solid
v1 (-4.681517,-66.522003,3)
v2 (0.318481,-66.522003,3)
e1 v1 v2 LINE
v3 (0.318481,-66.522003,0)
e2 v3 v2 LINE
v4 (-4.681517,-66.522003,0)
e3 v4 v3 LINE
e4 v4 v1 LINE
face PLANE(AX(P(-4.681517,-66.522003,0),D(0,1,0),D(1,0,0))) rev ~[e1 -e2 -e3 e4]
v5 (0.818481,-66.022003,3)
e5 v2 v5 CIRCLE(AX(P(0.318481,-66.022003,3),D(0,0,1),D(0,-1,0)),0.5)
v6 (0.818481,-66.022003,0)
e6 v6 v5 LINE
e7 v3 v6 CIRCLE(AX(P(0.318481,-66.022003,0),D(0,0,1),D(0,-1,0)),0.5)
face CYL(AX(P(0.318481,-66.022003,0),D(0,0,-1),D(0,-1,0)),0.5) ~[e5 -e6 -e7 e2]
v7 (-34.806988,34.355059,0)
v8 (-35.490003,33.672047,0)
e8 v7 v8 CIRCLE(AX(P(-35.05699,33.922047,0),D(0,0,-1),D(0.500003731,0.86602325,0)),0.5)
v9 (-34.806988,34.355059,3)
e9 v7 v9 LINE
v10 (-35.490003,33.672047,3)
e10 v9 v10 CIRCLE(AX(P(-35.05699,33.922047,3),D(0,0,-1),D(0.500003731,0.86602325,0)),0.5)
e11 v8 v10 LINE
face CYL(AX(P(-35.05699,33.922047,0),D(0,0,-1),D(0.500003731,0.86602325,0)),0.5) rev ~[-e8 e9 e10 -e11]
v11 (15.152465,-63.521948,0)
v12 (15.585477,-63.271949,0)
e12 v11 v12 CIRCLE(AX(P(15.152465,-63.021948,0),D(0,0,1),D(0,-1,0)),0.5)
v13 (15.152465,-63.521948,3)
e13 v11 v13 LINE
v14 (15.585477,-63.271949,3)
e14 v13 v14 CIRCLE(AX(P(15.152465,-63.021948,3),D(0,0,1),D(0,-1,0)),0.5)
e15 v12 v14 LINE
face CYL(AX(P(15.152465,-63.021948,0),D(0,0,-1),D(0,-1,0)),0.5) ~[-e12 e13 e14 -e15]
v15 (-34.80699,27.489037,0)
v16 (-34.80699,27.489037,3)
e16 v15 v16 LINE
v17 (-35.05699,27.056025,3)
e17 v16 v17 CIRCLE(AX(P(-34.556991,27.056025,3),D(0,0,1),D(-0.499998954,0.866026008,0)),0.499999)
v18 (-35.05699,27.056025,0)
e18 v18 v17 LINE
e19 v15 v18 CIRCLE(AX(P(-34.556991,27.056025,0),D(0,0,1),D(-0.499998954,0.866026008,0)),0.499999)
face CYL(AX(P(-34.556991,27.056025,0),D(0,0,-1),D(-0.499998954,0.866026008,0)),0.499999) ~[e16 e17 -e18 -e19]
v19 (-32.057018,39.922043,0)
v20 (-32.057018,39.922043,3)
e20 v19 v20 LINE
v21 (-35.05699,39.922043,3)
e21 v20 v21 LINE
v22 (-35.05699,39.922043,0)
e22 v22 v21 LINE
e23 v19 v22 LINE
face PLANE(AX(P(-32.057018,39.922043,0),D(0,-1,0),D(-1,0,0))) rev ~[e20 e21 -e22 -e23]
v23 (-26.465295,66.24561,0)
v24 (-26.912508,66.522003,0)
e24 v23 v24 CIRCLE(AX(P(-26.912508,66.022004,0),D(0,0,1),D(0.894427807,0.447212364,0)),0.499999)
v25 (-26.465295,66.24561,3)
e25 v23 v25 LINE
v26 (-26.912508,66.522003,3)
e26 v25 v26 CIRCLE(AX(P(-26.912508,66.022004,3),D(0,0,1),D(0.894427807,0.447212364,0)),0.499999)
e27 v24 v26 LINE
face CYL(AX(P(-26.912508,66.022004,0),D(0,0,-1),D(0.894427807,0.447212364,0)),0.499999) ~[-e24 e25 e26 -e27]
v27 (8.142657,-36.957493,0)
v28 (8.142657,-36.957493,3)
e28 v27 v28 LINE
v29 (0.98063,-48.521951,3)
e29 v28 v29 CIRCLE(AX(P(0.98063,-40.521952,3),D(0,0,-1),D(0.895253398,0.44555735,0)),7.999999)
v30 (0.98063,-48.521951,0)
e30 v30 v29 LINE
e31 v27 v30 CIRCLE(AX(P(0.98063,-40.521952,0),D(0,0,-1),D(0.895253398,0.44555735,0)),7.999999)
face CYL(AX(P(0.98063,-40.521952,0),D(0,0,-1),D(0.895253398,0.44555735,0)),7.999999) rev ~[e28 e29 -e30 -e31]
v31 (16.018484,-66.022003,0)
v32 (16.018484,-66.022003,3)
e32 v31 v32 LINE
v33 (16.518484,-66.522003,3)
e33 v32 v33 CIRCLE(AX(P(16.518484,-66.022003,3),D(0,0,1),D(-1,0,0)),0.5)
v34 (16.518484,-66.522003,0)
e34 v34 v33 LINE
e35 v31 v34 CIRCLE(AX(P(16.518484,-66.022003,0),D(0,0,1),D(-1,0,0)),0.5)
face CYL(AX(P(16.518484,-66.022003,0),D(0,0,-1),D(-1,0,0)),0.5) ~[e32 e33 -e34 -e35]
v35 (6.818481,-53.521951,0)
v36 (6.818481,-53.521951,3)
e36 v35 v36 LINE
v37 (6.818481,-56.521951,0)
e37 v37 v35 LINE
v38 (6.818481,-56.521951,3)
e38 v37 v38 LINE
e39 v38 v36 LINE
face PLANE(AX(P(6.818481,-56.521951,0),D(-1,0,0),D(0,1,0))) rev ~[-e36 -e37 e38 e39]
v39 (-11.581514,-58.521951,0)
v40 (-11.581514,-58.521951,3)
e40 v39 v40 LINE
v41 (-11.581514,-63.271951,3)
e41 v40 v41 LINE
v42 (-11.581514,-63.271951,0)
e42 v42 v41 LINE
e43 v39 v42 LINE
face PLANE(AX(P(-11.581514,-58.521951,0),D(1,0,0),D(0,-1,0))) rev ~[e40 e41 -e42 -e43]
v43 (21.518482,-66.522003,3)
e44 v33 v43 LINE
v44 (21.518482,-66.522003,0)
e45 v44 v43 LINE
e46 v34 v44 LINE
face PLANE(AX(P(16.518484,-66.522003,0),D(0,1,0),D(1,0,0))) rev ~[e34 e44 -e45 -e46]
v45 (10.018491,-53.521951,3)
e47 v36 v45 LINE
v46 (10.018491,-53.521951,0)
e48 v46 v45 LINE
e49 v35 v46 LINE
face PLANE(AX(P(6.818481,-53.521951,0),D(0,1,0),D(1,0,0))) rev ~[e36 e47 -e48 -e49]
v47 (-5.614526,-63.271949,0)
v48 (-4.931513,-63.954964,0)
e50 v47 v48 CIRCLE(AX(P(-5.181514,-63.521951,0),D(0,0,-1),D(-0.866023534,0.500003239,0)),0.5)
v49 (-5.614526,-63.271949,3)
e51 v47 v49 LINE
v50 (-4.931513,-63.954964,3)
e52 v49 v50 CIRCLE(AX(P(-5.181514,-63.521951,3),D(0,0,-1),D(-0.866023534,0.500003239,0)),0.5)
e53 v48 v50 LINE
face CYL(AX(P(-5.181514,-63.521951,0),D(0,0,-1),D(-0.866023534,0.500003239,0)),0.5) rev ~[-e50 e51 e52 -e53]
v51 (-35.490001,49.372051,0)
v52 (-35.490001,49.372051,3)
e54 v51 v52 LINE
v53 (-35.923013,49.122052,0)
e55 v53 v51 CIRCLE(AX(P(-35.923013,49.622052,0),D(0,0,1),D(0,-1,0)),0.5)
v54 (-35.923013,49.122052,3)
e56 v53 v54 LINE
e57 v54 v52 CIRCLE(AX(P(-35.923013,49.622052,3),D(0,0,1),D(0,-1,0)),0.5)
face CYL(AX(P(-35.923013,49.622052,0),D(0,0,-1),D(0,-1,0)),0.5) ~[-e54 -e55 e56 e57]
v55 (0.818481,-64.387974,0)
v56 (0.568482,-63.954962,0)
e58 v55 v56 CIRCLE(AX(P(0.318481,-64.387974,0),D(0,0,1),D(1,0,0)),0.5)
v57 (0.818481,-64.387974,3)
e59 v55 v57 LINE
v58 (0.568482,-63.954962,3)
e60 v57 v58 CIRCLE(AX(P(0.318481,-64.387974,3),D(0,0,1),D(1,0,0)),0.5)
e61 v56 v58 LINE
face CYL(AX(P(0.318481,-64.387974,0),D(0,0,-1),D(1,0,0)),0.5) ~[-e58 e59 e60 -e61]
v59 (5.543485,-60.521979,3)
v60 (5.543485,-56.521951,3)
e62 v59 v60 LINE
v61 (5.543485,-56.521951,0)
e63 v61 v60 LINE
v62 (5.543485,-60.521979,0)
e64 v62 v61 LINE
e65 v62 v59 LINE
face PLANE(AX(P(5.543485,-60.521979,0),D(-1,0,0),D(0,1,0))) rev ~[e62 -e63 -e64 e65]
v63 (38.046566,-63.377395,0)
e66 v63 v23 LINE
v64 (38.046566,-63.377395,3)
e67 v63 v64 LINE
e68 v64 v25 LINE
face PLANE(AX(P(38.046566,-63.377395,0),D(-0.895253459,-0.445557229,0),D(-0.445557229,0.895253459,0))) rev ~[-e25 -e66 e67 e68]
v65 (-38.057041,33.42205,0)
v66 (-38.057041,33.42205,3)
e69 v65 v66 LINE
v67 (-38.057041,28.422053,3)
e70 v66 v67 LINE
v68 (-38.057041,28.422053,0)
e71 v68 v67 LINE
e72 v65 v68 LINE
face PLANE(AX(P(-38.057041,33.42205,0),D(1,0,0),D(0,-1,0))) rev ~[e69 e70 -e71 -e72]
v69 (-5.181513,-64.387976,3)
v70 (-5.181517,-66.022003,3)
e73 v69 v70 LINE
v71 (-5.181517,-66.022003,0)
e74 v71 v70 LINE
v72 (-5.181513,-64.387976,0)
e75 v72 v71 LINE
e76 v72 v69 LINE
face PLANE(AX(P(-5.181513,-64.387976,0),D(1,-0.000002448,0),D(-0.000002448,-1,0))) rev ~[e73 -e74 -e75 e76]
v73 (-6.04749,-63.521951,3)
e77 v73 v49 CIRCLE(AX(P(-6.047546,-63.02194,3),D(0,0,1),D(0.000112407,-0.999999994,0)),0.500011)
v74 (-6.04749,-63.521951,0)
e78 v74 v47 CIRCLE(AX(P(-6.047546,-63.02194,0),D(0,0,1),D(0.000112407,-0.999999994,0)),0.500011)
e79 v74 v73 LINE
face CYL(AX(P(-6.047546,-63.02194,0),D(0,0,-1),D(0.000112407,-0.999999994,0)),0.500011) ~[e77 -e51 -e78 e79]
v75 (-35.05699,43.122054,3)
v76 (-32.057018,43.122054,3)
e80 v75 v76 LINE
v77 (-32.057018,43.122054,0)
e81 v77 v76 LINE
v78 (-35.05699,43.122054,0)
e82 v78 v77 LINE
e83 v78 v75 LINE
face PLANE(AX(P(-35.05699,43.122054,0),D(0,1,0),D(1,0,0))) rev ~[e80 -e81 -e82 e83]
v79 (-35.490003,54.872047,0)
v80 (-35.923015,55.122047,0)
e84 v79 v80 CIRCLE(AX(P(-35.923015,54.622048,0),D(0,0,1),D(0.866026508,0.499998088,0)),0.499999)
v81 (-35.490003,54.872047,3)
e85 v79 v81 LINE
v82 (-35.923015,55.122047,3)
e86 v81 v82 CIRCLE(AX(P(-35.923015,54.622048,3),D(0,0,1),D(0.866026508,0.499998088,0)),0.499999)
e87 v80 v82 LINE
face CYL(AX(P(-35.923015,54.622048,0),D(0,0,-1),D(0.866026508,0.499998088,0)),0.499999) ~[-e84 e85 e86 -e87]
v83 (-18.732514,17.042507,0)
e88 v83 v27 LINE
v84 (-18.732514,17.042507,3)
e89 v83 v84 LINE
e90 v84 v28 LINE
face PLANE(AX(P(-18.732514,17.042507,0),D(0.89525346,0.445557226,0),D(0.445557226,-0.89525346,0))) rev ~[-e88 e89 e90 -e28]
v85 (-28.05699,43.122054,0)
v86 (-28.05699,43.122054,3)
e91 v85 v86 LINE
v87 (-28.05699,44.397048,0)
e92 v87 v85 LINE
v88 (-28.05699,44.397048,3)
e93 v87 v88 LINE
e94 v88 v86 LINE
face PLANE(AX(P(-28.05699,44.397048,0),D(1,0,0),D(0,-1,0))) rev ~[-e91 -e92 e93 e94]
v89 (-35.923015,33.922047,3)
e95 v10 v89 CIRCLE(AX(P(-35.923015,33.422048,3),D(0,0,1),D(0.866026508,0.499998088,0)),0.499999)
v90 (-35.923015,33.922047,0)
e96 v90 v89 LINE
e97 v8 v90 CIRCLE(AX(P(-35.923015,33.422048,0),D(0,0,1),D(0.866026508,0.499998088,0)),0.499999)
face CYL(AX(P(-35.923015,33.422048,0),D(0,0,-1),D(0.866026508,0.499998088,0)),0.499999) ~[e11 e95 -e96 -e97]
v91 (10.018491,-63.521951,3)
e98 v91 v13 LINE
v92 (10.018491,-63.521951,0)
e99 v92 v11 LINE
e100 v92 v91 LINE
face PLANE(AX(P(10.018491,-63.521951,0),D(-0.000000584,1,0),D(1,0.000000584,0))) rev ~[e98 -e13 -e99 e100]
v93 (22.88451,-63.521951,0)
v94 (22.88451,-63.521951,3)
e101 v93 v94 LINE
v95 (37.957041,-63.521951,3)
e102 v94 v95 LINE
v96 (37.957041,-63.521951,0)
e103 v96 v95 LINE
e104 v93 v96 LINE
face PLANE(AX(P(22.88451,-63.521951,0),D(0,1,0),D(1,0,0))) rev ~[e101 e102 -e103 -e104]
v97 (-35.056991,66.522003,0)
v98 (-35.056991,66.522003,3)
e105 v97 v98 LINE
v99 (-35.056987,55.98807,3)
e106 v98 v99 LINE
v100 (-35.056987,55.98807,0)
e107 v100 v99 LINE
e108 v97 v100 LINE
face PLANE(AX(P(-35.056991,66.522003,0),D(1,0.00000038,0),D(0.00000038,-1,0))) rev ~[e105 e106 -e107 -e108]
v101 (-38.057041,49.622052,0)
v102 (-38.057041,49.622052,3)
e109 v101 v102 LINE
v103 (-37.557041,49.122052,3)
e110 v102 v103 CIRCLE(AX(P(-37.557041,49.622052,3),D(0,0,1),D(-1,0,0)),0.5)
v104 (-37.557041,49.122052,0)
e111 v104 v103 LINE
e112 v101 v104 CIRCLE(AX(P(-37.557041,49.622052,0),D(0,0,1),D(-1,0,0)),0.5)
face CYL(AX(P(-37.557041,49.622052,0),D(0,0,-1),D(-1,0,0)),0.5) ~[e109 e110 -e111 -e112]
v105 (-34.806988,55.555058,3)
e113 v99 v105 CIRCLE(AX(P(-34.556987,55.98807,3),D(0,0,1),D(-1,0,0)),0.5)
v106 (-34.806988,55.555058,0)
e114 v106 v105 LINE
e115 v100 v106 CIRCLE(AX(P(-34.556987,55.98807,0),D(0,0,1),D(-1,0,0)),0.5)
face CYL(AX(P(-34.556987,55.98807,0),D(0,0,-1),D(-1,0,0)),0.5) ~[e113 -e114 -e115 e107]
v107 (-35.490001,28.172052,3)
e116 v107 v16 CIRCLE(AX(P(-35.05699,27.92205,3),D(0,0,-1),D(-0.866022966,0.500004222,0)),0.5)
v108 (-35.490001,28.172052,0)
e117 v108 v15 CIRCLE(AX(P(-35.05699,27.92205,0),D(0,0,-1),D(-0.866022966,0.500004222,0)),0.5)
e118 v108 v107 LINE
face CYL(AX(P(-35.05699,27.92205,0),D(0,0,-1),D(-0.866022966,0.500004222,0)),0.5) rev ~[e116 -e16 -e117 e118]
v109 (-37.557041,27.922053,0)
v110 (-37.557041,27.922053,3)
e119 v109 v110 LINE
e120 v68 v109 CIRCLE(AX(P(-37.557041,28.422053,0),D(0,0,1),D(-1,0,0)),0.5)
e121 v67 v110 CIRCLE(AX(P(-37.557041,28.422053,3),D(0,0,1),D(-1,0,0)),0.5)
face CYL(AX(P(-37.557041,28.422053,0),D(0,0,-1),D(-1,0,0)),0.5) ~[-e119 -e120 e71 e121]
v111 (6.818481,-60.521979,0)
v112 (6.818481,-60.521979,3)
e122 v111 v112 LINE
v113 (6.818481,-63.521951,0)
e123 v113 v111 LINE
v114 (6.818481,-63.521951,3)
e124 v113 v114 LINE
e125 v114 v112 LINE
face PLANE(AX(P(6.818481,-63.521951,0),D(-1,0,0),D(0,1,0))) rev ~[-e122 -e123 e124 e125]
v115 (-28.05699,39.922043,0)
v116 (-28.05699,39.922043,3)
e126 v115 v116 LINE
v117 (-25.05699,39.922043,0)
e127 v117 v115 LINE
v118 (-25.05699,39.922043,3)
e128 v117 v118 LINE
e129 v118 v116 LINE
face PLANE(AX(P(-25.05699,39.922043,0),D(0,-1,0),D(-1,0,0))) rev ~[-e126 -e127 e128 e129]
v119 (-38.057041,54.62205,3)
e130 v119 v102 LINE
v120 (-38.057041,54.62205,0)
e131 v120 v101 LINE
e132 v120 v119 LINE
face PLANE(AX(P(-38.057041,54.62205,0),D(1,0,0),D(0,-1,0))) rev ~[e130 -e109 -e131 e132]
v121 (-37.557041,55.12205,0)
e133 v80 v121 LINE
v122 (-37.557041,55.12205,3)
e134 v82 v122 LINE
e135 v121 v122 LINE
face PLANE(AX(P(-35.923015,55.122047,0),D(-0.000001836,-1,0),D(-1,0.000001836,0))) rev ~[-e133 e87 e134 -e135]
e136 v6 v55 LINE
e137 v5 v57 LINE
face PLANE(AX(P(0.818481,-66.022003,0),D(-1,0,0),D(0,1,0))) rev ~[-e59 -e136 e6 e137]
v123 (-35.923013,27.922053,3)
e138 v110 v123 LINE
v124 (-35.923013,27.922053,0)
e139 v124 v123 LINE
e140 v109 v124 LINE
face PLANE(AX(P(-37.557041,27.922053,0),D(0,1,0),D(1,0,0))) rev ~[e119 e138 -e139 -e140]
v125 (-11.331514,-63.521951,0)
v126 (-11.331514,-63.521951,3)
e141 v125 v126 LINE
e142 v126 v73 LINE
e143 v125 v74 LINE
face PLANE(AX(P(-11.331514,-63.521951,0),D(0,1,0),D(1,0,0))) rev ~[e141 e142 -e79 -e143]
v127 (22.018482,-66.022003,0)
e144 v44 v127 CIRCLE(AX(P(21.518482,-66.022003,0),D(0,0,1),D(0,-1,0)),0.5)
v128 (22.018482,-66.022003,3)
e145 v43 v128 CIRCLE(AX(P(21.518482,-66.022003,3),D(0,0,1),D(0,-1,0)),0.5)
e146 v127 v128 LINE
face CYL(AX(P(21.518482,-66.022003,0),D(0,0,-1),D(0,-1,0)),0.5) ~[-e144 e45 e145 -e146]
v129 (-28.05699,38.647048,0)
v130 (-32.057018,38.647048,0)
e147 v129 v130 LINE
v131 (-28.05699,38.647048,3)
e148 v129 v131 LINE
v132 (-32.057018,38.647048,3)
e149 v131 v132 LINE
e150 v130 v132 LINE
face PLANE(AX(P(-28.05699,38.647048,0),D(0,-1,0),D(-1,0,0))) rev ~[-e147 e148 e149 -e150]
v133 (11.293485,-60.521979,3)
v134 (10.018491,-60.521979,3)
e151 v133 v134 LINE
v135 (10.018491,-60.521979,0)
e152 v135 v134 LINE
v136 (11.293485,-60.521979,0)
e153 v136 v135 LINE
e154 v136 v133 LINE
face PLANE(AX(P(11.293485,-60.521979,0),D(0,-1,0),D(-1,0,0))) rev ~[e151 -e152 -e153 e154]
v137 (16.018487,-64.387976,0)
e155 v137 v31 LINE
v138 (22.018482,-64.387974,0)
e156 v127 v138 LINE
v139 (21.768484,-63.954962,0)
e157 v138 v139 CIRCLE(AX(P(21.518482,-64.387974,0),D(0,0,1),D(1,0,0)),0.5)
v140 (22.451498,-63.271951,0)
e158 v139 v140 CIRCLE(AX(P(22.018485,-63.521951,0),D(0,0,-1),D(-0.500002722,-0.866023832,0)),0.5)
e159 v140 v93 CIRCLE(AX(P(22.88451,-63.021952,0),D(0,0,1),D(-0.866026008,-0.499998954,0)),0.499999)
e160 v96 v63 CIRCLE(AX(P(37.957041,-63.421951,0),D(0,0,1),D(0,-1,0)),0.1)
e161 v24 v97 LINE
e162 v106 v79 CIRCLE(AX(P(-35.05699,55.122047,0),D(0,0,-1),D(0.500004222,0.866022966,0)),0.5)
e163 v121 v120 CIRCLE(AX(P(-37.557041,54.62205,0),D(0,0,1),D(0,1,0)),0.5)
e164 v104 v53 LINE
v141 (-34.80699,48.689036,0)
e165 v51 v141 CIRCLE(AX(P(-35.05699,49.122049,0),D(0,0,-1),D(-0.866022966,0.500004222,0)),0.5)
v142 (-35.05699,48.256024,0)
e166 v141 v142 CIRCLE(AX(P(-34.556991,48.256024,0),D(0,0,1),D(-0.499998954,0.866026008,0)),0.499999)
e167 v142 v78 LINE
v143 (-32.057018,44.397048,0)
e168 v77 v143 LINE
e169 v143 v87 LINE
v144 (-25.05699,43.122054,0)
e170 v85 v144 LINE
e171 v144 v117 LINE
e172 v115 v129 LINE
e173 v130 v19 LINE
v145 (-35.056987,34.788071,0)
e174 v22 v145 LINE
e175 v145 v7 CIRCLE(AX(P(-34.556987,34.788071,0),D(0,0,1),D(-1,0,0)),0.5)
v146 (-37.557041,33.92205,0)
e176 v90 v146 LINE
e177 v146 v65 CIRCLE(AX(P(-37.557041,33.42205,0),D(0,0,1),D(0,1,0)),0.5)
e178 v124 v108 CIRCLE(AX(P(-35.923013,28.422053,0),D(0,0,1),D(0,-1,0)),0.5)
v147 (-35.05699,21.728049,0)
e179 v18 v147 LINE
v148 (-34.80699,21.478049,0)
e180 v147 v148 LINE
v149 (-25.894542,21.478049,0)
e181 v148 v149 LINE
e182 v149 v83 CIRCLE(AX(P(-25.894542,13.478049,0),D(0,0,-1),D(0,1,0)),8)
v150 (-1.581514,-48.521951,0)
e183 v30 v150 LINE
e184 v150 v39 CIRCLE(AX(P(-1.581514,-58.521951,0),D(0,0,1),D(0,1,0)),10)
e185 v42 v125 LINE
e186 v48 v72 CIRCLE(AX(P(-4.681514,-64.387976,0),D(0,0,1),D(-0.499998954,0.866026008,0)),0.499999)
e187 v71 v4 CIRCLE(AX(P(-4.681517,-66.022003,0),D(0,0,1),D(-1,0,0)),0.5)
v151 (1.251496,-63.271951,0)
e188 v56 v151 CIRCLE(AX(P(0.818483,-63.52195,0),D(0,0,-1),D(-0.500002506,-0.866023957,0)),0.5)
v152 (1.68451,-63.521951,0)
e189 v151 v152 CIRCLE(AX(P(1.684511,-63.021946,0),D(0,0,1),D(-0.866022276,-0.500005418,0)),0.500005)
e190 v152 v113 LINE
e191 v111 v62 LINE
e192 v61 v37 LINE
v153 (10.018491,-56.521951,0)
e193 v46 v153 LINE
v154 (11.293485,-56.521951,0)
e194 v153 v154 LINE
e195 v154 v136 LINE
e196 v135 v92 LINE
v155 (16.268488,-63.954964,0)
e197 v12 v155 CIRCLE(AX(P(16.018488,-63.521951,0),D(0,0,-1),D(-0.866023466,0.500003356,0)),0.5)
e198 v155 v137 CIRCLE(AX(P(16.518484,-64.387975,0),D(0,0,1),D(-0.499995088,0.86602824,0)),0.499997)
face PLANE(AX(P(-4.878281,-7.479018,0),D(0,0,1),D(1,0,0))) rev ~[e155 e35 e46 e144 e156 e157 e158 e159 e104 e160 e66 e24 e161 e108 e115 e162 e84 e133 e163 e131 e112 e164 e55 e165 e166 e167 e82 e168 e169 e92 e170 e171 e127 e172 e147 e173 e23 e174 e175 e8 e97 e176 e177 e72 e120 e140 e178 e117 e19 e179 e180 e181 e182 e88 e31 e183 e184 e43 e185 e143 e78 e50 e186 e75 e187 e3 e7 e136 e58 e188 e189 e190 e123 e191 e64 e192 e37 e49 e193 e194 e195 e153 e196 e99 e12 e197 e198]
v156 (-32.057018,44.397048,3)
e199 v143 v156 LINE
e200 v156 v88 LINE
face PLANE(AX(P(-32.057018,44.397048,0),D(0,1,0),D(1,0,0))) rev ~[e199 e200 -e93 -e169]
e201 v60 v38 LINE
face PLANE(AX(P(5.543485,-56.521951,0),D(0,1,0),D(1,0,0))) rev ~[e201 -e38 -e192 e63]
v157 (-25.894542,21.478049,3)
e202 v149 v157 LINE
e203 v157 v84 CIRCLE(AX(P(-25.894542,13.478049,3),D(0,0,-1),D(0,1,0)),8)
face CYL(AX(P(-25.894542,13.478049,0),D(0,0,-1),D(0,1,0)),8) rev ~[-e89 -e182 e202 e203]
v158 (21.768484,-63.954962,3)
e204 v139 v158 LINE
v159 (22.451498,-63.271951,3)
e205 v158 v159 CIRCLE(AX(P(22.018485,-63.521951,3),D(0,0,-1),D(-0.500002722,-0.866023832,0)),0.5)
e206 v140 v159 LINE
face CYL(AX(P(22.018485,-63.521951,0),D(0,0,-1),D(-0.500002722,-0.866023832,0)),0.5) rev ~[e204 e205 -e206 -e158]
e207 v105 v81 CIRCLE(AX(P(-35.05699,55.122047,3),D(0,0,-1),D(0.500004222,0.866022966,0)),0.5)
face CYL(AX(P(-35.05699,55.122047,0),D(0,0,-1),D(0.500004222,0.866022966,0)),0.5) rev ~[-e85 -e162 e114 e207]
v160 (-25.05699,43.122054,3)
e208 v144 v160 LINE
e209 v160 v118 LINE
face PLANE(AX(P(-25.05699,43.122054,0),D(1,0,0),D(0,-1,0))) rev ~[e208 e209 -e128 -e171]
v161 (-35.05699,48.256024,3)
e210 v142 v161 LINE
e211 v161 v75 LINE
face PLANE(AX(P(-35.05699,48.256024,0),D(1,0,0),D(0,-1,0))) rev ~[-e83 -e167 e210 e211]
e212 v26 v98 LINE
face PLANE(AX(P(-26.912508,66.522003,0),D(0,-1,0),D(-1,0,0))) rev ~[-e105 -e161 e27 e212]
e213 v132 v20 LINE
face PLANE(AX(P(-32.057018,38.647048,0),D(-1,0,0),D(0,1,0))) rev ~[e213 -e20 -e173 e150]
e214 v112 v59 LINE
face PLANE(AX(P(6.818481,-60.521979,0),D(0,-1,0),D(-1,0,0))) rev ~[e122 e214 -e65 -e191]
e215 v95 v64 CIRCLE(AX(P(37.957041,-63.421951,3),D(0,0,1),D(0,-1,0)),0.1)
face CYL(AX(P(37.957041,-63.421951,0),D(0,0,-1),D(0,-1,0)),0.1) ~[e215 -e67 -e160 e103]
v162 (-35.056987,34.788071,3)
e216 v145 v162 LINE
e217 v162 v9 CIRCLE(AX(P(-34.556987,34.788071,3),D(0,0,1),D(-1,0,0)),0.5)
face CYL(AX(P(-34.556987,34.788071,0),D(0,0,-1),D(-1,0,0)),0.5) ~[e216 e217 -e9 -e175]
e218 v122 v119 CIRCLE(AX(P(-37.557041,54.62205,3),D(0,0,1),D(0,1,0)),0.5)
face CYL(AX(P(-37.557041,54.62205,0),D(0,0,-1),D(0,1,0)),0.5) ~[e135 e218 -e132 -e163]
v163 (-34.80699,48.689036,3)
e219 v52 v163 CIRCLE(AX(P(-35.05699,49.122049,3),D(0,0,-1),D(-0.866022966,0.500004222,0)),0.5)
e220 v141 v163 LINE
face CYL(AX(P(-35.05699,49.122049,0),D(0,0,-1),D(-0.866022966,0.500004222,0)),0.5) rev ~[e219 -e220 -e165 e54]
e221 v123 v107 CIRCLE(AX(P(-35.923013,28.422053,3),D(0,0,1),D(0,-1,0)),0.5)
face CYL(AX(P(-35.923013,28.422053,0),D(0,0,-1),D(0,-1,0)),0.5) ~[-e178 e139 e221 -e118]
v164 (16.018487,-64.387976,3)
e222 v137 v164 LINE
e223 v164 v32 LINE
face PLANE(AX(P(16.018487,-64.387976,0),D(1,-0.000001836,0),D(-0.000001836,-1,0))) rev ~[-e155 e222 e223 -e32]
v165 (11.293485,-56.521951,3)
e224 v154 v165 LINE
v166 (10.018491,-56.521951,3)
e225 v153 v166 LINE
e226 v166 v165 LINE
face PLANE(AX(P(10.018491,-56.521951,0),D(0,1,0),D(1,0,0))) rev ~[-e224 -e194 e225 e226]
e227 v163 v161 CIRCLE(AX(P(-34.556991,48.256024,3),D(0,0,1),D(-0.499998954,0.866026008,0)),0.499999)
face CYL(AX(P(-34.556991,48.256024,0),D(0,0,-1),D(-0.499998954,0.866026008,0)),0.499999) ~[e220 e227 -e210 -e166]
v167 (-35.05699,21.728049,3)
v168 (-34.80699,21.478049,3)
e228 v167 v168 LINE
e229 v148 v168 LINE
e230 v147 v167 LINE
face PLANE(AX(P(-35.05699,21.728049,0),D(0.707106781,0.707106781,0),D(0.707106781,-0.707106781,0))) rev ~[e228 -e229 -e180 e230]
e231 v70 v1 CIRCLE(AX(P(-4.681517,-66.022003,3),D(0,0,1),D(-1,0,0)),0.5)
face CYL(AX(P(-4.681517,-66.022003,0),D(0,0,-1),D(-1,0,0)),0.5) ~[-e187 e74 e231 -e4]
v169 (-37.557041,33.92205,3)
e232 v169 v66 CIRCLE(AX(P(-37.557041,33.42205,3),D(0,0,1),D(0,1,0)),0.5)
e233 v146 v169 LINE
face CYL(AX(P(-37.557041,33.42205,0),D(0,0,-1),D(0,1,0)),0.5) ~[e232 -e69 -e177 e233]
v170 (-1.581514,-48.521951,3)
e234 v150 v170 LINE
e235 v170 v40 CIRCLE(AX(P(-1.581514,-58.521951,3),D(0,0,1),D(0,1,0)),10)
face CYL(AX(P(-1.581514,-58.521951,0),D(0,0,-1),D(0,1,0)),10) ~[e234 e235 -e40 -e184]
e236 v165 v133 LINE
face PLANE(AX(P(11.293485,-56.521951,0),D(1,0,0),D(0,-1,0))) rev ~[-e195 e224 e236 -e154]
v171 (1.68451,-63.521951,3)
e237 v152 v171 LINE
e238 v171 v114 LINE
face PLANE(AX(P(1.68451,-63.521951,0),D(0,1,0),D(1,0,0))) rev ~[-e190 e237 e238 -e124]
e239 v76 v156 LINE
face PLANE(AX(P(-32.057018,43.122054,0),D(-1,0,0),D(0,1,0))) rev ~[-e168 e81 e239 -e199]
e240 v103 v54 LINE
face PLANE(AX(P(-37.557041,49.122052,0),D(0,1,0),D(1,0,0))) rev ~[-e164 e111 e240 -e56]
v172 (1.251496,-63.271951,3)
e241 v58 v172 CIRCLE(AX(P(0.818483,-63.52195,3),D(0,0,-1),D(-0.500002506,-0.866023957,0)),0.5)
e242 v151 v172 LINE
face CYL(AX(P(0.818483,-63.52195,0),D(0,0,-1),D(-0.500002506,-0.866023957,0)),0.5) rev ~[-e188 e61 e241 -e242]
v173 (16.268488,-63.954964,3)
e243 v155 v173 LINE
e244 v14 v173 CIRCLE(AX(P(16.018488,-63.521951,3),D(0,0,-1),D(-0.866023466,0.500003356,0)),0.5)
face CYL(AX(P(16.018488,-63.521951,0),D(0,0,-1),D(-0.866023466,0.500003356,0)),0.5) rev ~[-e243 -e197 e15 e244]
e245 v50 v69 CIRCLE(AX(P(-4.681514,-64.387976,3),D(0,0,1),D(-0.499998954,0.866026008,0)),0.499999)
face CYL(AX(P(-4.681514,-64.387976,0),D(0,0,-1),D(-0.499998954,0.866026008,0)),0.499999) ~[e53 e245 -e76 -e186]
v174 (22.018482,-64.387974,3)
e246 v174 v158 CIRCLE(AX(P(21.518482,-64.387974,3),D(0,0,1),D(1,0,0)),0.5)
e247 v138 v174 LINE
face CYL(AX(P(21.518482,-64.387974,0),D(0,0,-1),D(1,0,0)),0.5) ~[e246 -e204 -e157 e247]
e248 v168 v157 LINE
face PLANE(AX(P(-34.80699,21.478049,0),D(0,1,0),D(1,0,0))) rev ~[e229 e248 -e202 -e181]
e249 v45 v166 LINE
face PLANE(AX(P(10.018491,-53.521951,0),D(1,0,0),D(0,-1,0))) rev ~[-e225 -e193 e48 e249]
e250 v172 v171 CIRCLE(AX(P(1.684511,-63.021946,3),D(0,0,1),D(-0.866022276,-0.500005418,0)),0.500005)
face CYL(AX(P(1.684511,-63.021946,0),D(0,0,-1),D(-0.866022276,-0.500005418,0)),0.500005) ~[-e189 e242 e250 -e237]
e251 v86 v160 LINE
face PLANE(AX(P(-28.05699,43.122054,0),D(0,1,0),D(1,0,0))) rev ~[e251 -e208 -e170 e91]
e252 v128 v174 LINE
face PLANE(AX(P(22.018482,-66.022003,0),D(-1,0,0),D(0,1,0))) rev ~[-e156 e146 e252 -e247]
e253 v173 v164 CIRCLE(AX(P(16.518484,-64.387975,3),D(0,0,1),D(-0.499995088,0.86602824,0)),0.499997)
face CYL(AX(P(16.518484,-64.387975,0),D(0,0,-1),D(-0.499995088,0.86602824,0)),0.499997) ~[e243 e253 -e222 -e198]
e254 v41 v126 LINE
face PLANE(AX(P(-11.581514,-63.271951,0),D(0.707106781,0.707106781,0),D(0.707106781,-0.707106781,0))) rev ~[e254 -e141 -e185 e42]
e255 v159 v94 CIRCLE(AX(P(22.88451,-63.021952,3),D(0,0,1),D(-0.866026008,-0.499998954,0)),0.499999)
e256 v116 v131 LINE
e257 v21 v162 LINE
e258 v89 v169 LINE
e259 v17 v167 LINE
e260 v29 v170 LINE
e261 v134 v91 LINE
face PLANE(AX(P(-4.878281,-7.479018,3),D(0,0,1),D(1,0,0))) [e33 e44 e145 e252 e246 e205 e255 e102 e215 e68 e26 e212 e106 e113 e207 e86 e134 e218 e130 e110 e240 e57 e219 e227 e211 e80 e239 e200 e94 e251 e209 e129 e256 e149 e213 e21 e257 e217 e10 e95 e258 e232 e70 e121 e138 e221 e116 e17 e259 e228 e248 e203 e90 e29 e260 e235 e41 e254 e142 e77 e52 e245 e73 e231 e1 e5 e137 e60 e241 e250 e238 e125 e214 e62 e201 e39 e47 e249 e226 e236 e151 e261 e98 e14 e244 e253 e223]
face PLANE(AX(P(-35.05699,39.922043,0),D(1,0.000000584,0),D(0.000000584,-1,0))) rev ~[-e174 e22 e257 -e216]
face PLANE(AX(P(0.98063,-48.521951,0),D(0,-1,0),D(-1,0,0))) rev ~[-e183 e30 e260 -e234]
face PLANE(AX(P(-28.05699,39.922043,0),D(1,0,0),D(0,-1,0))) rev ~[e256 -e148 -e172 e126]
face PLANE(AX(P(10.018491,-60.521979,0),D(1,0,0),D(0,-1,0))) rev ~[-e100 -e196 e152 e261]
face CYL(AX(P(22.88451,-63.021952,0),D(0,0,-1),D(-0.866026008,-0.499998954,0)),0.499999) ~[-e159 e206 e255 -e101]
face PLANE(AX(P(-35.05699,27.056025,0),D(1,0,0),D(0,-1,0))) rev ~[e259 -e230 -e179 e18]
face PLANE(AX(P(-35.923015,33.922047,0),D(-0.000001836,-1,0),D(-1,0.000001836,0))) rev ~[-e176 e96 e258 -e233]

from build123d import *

# Parameters (mm, degrees)
F1_DEPTH = 3


# Not quite as in the source:
# - ends of sketch curves that miss each other by under 0.0002 mm in the source are joined


with BuildPart() as f1:
    # F0 (on Top) → F1 (new body)
    with BuildSketch(Plane.XY):
        with BuildLine():
            Line((-11.331514, -63.521951), (-6.04749, -63.521951))
            ThreePointArc((-6.04749, -63.521951), (-5.797538527, -63.4549610061), (-5.6145259066, -63.2719490539))
            ThreePointArc((-5.6145259066, -63.2719490539), (-4.8279591264, -63.1683980924), (-4.9315131291, -63.9549637764))
            ThreePointArc((-4.9315131291, -63.9549637764), (-5.1145256646, -64.1379759355), (-5.181513, -64.387976))
            Line((-5.181513, -64.387976), (-5.181517, -66.022003))
            ThreePointArc((-5.181517, -66.022003), (-5.0350703906, -66.3755563906), (-4.681517, -66.522003))
            Line((-4.681517, -66.522003), (0.318481, -66.522003))
            ThreePointArc((0.318481, -66.522003), (0.6720343906, -66.3755563906), (0.818481, -66.022003))
            Line((0.818481, -66.022003), (0.818481, -64.387974))
            ThreePointArc((0.818481, -64.387974), (0.7514940061, -64.137974527), (0.5684820539, -63.9549619066))
            ThreePointArc((0.5684820539, -63.9549619066), (0.4649300924, -63.1683971264), (1.2514957764, -63.2719511291))
            ThreePointArc((1.2514957764, -63.2719511291), (1.4345099355, -63.4549636646), (1.68451, -63.521951))
            Line((1.68451, -63.521951), (6.818481, -63.521951))
            Line((6.818481, -63.521951), (6.818481, -60.521979))
            Line((6.818481, -60.521979), (5.543485, -60.521979))
            Line((5.543485, -60.521979), (5.543485, -56.521951))
            Line((5.543485, -56.521951), (6.818481, -56.521951))
            Line((6.818481, -56.521951), (6.818481, -53.521951))
            Line((6.818481, -53.521951), (10.018491, -53.521951))
            Line((10.018491, -53.521951), (10.018491, -56.521951))
            Line((10.018491, -56.521951), (11.293485, -56.521951))
            Line((11.293485, -56.521951), (11.293485, -60.521979))
            Line((11.293485, -60.521979), (10.018491, -60.521979))
            Line((10.018491, -60.521979), (10.018491, -63.521951))
            Line((10.018491, -63.521951), (15.152465, -63.521948))
            ThreePointArc((15.152465, -63.521948), (15.4024642565, -63.4549611311), (15.5854768434, -63.2719494869))
            ThreePointArc((15.5854768434, -63.2719494869), (16.3720418736, -63.1683980924), (16.2684878709, -63.9549637764))
            ThreePointArc((16.2684878709, -63.9549637764), (16.0854743354, -64.1379759355), (16.018487, -64.387976))
            Line((16.018487, -64.387976), (16.018484, -66.022003))
            ThreePointArc((16.018484, -66.022003), (16.1649306094, -66.3755563906), (16.518484, -66.522003))
            Line((16.518484, -66.522003), (21.518482, -66.522003))
            ThreePointArc((21.518482, -66.522003), (21.8720353906, -66.3755563906), (22.018482, -66.022003))
            Line((22.018482, -66.022003), (22.018482, -64.387974))
            ThreePointArc((22.018482, -64.387974), (21.9514952226, -64.137974902), (21.7684838039, -63.9549623396))
            ThreePointArc((21.7684838039, -63.9549623396), (21.6649320924, -63.1683971264), (22.4514977764, -63.2719511291))
            ThreePointArc((22.4514977764, -63.2719511291), (22.634510152, -63.4549637896), (22.88451, -63.521951))
            Line((22.88451, -63.521951), (37.957041, -63.521951))
            ThreePointArc((37.957041, -63.521951), (38.0420573761, -63.4746028356), (38.0465663652, -63.3773953159))
            Line((38.0465663652, -63.3773953159), (-26.465295, 66.24561))
            ThreePointArc((-26.465295, 66.24561), (-26.6496426342, 66.4473285217), (-26.912508, 66.522003))
            Line((-26.912508, 66.522003), (-35.056991, 66.522003))
            Line((-35.056991, 66.522003), (-35.056987, 55.98807))
            ThreePointArc((-35.056987, 55.98807), (-34.9900000061, 55.738070527), (-34.8069880539, 55.5550579066))
            ThreePointArc((-34.8069880539, 55.5550579066), (-34.7034372218, 54.768492997), (-35.4900025264, 54.8720466961))
            ThreePointArc((-35.4900025264, 54.8720466961), (-35.6730149355, 55.0550596646), (-35.923015, 55.122047))
            Line((-35.923015, 55.122047), (-37.557041, 55.12205))
            ThreePointArc((-37.557041, 55.12205), (-37.9105943906, 54.9756033906), (-38.057041, 54.62205))
            Line((-38.057041, 54.62205), (-38.057041, 49.622052))
            ThreePointArc((-38.057041, 49.622052), (-37.9105943906, 49.2684986094), (-37.557041, 49.122052))
            Line((-37.557041, 49.122052), (-35.923013, 49.122052))
            ThreePointArc((-35.923013, 49.122052), (-35.673013527, 49.1890389939), (-35.4900009066, 49.3720509461))
            ThreePointArc((-35.4900009066, 49.3720509461), (-34.7034359497, 49.4756017309), (-34.8069901291, 48.6890362236))
            ThreePointArc((-34.8069901291, 48.6890362236), (-34.9900026646, 48.5060240645), (-35.05699, 48.256024))
            Line((-35.05699, 48.256024), (-35.05699, 43.122054))
            Line((-35.05699, 43.122054), (-32.057018, 43.122054))
            Line((-32.057018, 43.122054), (-32.057018, 44.397048))
            Line((-32.057018, 44.397048), (-28.05699, 44.397048))
            Line((-28.05699, 44.397048), (-28.05699, 43.122054))
            Line((-28.05699, 43.122054), (-25.05699, 43.122054))
            Line((-25.05699, 43.122054), (-25.05699, 39.922043))
            Line((-25.05699, 39.922043), (-28.05699, 39.922043))
            Line((-28.05699, 39.922043), (-28.05699, 38.647048))
            Line((-28.05699, 38.647048), (-32.057018, 38.647048))
            Line((-32.057018, 38.647048), (-32.057018, 39.922043))
            Line((-32.057018, 39.922043), (-35.05699, 39.922043))
            Line((-35.05699, 39.922043), (-35.056987, 34.788071))
            ThreePointArc((-35.056987, 34.788071), (-34.9900000061, 34.538071527), (-34.8069880539, 34.3550589066))
            ThreePointArc((-34.8069880539, 34.3550589066), (-34.7034372218, 33.568492997), (-35.4900025264, 33.6720466961))
            ThreePointArc((-35.4900025264, 33.6720466961), (-35.6730149355, 33.8550596646), (-35.923015, 33.922047))
            Line((-35.923015, 33.922047), (-37.557041, 33.92205))
            ThreePointArc((-37.557041, 33.92205), (-37.9105943906, 33.7756033906), (-38.057041, 33.42205))
            Line((-38.057041, 33.42205), (-38.057041, 28.422053))
            ThreePointArc((-38.057041, 28.422053), (-37.9105943906, 28.0684996094), (-37.557041, 27.922053))
            Line((-37.557041, 27.922053), (-35.923013, 27.922053))
            ThreePointArc((-35.923013, 27.922053), (-35.673013527, 27.9890399939), (-35.4900009066, 28.1720519461))
            ThreePointArc((-35.4900009066, 28.1720519461), (-34.7034359497, 28.2756027309), (-34.8069901291, 27.4890372236))
            ThreePointArc((-34.8069901291, 27.4890372236), (-34.9900026646, 27.3060250645), (-35.05699, 27.056025))
            Line((-35.05699, 27.056025), (-35.05699, 21.728049))
            Line((-35.05699, 21.728049), (-34.80699, 21.478049))
            Line((-34.80699, 21.478049), (-25.894542, 21.478049))
            ThreePointArc((-25.894542, 21.478049), (-21.6823966253, 20.2793600017), (-18.7325143305, 17.0425068355))
            Line((-18.7325143305, 17.0425068355), (8.142657, -36.957493))
            ThreePointArc((8.142657, -36.957493), (7.781941119, -44.7340961853), (0.98063, -48.521951))
            Line((0.98063, -48.521951), (-1.581514, -48.521951))
            ThreePointArc((-1.581514, -48.521951), (-8.6525818119, -51.4508831881), (-11.581514, -58.521951))
            Line((-11.581514, -58.521951), (-11.581514, -63.271951))
            Line((-11.581514, -63.271951), (-11.331514, -63.521951))
        make_face()
    extrude(amount=F1_DEPTH)


solid = f1.part
